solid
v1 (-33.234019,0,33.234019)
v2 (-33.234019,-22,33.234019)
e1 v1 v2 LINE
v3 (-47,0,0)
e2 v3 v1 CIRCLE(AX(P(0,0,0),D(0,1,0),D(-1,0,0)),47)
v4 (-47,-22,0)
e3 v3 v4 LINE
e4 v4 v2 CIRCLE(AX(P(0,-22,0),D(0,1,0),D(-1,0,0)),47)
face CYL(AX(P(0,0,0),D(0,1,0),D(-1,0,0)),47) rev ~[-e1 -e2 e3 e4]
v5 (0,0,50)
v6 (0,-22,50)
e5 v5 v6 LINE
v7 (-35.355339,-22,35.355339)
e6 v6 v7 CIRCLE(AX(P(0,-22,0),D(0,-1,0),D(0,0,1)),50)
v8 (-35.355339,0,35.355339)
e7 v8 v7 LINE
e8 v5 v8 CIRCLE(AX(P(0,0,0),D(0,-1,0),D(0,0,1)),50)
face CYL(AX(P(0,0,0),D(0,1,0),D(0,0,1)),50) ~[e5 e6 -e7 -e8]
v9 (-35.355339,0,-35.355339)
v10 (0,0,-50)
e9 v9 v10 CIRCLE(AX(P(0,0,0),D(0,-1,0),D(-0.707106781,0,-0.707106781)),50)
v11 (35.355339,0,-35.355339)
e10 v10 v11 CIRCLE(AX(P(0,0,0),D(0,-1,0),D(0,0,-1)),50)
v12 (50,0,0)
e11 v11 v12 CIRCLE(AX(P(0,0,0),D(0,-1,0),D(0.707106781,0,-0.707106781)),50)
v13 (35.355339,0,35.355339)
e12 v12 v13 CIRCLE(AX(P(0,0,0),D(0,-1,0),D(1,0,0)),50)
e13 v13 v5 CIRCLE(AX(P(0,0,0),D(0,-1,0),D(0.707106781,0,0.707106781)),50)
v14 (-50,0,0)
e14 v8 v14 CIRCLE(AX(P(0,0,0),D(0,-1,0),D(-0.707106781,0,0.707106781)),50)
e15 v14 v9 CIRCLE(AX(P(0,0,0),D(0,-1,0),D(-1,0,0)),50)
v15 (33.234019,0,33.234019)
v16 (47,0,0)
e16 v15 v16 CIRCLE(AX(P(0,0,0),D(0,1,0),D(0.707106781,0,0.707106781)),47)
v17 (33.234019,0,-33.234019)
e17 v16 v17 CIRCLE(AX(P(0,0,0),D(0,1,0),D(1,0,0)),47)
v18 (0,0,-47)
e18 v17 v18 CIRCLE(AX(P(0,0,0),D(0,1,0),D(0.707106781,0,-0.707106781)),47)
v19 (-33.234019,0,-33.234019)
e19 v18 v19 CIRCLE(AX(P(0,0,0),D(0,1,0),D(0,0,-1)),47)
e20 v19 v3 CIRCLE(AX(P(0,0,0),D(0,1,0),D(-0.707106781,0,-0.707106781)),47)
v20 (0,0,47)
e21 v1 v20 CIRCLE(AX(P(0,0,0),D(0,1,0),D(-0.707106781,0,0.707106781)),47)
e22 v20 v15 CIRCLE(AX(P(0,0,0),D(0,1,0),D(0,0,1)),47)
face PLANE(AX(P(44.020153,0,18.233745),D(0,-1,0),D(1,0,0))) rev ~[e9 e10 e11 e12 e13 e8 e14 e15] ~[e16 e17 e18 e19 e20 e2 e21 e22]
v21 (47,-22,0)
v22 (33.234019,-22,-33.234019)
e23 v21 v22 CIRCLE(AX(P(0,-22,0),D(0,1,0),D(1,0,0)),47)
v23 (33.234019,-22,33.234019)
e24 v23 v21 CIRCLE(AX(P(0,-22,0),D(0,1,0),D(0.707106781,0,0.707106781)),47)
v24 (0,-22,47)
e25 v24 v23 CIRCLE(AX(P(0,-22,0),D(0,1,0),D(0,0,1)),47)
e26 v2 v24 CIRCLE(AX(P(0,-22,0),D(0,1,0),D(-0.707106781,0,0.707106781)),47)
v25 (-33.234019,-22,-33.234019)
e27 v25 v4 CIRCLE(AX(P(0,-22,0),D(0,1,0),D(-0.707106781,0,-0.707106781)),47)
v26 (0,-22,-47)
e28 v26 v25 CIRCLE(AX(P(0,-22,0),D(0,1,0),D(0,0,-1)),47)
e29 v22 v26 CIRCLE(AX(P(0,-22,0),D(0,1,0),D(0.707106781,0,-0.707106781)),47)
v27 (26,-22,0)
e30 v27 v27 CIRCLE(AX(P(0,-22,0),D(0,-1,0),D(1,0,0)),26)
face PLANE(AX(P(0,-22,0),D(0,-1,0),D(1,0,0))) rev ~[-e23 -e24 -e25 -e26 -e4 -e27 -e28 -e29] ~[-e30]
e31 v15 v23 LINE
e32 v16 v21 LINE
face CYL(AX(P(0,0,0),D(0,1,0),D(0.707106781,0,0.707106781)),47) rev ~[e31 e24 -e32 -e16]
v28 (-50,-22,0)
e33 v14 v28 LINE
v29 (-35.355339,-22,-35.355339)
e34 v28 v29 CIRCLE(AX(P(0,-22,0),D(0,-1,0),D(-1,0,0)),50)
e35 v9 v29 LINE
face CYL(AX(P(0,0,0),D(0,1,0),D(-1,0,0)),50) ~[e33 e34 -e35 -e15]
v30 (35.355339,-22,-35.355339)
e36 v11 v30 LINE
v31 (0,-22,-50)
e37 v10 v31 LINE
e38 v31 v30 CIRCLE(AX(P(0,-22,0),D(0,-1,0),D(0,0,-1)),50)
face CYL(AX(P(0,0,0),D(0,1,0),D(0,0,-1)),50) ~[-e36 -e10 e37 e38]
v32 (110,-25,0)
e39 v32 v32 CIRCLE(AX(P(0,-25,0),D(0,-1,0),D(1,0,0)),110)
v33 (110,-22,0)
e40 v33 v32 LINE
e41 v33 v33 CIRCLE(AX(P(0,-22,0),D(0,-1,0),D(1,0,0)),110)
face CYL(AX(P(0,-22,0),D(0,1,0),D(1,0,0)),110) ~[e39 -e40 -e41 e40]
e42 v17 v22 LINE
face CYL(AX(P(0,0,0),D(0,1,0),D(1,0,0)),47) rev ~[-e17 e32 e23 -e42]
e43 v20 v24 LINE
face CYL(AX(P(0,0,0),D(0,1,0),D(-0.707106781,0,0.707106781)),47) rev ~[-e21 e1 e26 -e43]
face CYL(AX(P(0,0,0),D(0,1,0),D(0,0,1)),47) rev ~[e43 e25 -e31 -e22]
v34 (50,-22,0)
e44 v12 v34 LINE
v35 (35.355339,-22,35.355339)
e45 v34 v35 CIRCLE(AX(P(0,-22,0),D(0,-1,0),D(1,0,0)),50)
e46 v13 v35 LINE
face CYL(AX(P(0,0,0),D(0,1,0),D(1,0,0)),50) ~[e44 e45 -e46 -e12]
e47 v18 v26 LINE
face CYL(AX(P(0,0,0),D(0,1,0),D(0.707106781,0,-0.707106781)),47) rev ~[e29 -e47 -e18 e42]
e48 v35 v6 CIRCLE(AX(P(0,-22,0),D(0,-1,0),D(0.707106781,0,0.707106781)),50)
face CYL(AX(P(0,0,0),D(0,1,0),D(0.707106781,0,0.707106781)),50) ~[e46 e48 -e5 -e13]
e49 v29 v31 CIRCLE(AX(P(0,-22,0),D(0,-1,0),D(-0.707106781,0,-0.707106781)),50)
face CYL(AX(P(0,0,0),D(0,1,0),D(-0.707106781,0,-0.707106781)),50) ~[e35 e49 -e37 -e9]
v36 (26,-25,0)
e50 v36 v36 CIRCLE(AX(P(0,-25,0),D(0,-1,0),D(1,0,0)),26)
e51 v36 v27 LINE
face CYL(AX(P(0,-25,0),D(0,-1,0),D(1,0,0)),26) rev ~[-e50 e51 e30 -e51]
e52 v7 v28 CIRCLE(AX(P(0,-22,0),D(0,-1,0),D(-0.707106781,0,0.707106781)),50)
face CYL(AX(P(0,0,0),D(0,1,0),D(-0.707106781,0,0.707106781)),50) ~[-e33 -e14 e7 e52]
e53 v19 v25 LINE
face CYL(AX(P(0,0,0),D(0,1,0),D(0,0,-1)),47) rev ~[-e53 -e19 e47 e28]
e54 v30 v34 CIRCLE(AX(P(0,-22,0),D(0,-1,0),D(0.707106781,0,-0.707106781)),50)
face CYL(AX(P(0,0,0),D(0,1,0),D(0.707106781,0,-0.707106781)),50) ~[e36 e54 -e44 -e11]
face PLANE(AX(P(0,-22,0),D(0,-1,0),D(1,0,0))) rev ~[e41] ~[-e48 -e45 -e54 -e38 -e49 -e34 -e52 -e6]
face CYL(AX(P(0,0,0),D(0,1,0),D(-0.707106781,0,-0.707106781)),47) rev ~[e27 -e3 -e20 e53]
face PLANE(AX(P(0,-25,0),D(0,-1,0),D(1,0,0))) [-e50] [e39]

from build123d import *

# Parameters (mm, degrees)
F1_DEPTH = 22
F2_R     = 110
F2_R_2   = 50
F2_R_3   = 47
F3_DEPTH = 3
F4_R     = 26
F5_DEPTH = 3
F6_DEPTH = 25


# Not quite as in the source:
# - a feature names something its author has since deleted; it is built from what else it names


with BuildPart() as f1:
    # F0 (on Front) → F1 (new body)
    with BuildSketch(Plane.XZ):
        with BuildLine():
            Line((48.5, 0), (50, 0))
            ThreePointArc((50, 0), (46.1939766256, 19.1341716183), (35.3553390593, 35.3553390593))
            Line((35.3553390593, 35.3553390593), (34.2946788875, 34.2946788875))
            ThreePointArc((34.2946788875, 34.2946788875), (44.8081573268, 18.5601464697), (48.5, 0))
        make_face()
        with BuildLine():
            ThreePointArc((35.3553390593, -35.3553390593), (46.1939766256, -19.1341716183), (50, 0))
            Line((50, 0), (48.5, 0))
            ThreePointArc((48.5, 0), (44.8081573268, -18.5601464697), (34.2946788875, -34.2946788875))
            Line((34.2946788875, -34.2946788875), (35.3553390593, -35.3553390593))
        make_face()
        with BuildLine():
            Line((34.2946788875, 34.2946788875), (35.3553390593, 35.3553390593))
            ThreePointArc((35.3553390593, 35.3553390593), (19.1341716183, 46.1939766256), (0, 50))
            Line((0, 50), (0, 48.5))
            ThreePointArc((0, 48.5), (18.5601464697, 44.8081573268), (34.2946788875, 34.2946788875))
        make_face()
        with BuildLine():
            ThreePointArc((0, -50), (19.1341716183, -46.1939766256), (35.3553390593, -35.3553390593))
            Line((35.3553390593, -35.3553390593), (34.2946788875, -34.2946788875))
            ThreePointArc((34.2946788875, -34.2946788875), (18.5601464697, -44.8081573268), (0, -48.5))
            Line((0, -48.5), (0, -50))
        make_face()
        with BuildLine():
            Line((47, 0), (48.5, 0))
            ThreePointArc((48.5, 0), (44.8081573268, 18.5601464697), (34.2946788875, 34.2946788875))
            Line((34.2946788875, 34.2946788875), (33.2340187158, 33.2340187158))
            ThreePointArc((33.2340187158, 33.2340187158), (43.422338028, 17.9861213212), (47, 0))
        make_face()
        with BuildLine():
            ThreePointArc((34.2946788875, -34.2946788875), (44.8081573268, -18.5601464697), (48.5, 0))
            Line((48.5, 0), (47, 0))
            ThreePointArc((47, 0), (43.422338028, -17.9861213212), (33.2340187158, -33.2340187158))
            Line((33.2340187158, -33.2340187158), (34.2946788875, -34.2946788875))
        make_face()
        with BuildLine():
            Line((0, 48.5), (0, 50))
            ThreePointArc((0, 50), (-19.1341716183, 46.1939766256), (-35.3553390593, 35.3553390593))
            Line((-35.3553390593, 35.3553390593), (-34.2946788875, 34.2946788875))
            ThreePointArc((-34.2946788875, 34.2946788875), (-18.5601464697, 44.8081573268), (0, 48.5))
        make_face()
        with BuildLine():
            Line((33.2340187158, 33.2340187158), (34.2946788875, 34.2946788875))
            ThreePointArc((34.2946788875, 34.2946788875), (18.5601464697, 44.8081573268), (0, 48.5))
            Line((0, 48.5), (0, 47))
            ThreePointArc((0, 47), (17.9861213212, 43.422338028), (33.2340187158, 33.2340187158))
        make_face()
        with BuildLine():
            ThreePointArc((-35.3553390593, -35.3553390593), (-19.1341716183, -46.1939766256), (0, -50))
            Line((0, -50), (0, -48.5))
            ThreePointArc((0, -48.5), (-18.5601464697, -44.8081573268), (-34.2946788875, -34.2946788875))
            Line((-34.2946788875, -34.2946788875), (-35.3553390593, -35.3553390593))
        make_face()
        with BuildLine():
            ThreePointArc((0, -48.5), (18.5601464697, -44.8081573268), (34.2946788875, -34.2946788875))
            Line((34.2946788875, -34.2946788875), (33.2340187158, -33.2340187158))
            ThreePointArc((33.2340187158, -33.2340187158), (17.9861213212, -43.422338028), (0, -47))
            Line((0, -47), (0, -48.5))
        make_face()
        with BuildLine():
            Line((-34.2946788875, 34.2946788875), (-35.3553390593, 35.3553390593))
            ThreePointArc((-35.3553390593, 35.3553390593), (-46.1939766256, 19.1341716183), (-50, 0))
            Line((-50, 0), (-48.5, 0))
            ThreePointArc((-48.5, 0), (-44.8081573268, 18.5601464697), (-34.2946788875, 34.2946788875))
        make_face()
        with BuildLine():
            Line((0, 47), (0, 48.5))
            ThreePointArc((0, 48.5), (-18.5601464697, 44.8081573268), (-34.2946788875, 34.2946788875))
            Line((-34.2946788875, 34.2946788875), (-33.2340187158, 33.2340187158))
            ThreePointArc((-33.2340187158, 33.2340187158), (-17.9861213212, 43.422338028), (0, 47))
        make_face()
        with BuildLine():
            ThreePointArc((-50, 0), (-46.1939766256, -19.1341716183), (-35.3553390593, -35.3553390593))
            Line((-35.3553390593, -35.3553390593), (-34.2946788875, -34.2946788875))
            ThreePointArc((-34.2946788875, -34.2946788875), (-44.8081573268, -18.5601464697), (-48.5, 0))
            Line((-48.5, 0), (-50, 0))
        make_face()
        with BuildLine():
            ThreePointArc((-34.2946788875, -34.2946788875), (-18.5601464697, -44.8081573268), (0, -48.5))
            Line((0, -48.5), (0, -47))
            ThreePointArc((0, -47), (-17.9861213212, -43.422338028), (-33.2340187158, -33.2340187158))
            Line((-33.2340187158, -33.2340187158), (-34.2946788875, -34.2946788875))
        make_face()
        with BuildLine():
            Line((-33.2340187158, 33.2340187158), (-34.2946788875, 34.2946788875))
            ThreePointArc((-34.2946788875, 34.2946788875), (-44.8081573268, 18.5601464697), (-48.5, 0))
            Line((-48.5, 0), (-47, 0))
            ThreePointArc((-47, 0), (-43.422338028, 17.9861213212), (-33.2340187158, 33.2340187158))
        make_face()
        with BuildLine():
            ThreePointArc((-48.5, 0), (-44.8081573268, -18.5601464697), (-34.2946788875, -34.2946788875))
            Line((-34.2946788875, -34.2946788875), (-33.2340187158, -33.2340187158))
            ThreePointArc((-33.2340187158, -33.2340187158), (-43.422338028, -17.9861213212), (-47, 0))
            Line((-47, 0), (-48.5, 0))
        make_face()
    extrude(amount=F1_DEPTH)

    # F2 (on face) → F3 (join)
    with BuildSketch(Plane.XZ.offset(22)):
        Circle(F2_R)
        Circle(F2_R_2, mode=Mode.SUBTRACT)
        Circle(F2_R_2)
        Circle(F2_R_3, mode=Mode.SUBTRACT)
        Circle(F2_R_3)
    extrude(amount=F3_DEPTH)

    # F4 (on face) → F5 (cut, through all)
    with BuildSketch(Plane.XZ.offset(25)):
        Circle(F4_R)
    extrude(amount=-F5_DEPTH, mode=Mode.SUBTRACT)

    # F0 (on Front) → F6 (join)
    with BuildSketch(Plane.XZ):
        with BuildLine():
            Line((48.5, 0), (50, 0))
            ThreePointArc((50, 0), (46.1939766256, 19.1341716183), (35.3553390593, 35.3553390593))
            Line((35.3553390593, 35.3553390593), (34.2946788875, 34.2946788875))
            ThreePointArc((34.2946788875, 34.2946788875), (44.8081573268, 18.5601464697), (48.5, 0))
        make_face()
        with BuildLine():
            ThreePointArc((35.3553390593, -35.3553390593), (46.1939766256, -19.1341716183), (50, 0))
            Line((50, 0), (48.5, 0))
            ThreePointArc((48.5, 0), (44.8081573268, -18.5601464697), (34.2946788875, -34.2946788875))
            Line((34.2946788875, -34.2946788875), (35.3553390593, -35.3553390593))
        make_face()
        with BuildLine():
            Line((34.2946788875, 34.2946788875), (35.3553390593, 35.3553390593))
            ThreePointArc((35.3553390593, 35.3553390593), (19.1341716183, 46.1939766256), (0, 50))
            Line((0, 50), (0, 48.5))
            ThreePointArc((0, 48.5), (18.5601464697, 44.8081573268), (34.2946788875, 34.2946788875))
        make_face()
        with BuildLine():
            ThreePointArc((0, -50), (19.1341716183, -46.1939766256), (35.3553390593, -35.3553390593))
            Line((35.3553390593, -35.3553390593), (34.2946788875, -34.2946788875))
            ThreePointArc((34.2946788875, -34.2946788875), (18.5601464697, -44.8081573268), (0, -48.5))
            Line((0, -48.5), (0, -50))
        make_face()
        with BuildLine():
            Line((0, 48.5), (0, 50))
            ThreePointArc((0, 50), (-19.1341716183, 46.1939766256), (-35.3553390593, 35.3553390593))
            Line((-35.3553390593, 35.3553390593), (-34.2946788875, 34.2946788875))
            ThreePointArc((-34.2946788875, 34.2946788875), (-18.5601464697, 44.8081573268), (0, 48.5))
        make_face()
        with BuildLine():
            ThreePointArc((-35.3553390593, -35.3553390593), (-19.1341716183, -46.1939766256), (0, -50))
            Line((0, -50), (0, -48.5))
            ThreePointArc((0, -48.5), (-18.5601464697, -44.8081573268), (-34.2946788875, -34.2946788875))
            Line((-34.2946788875, -34.2946788875), (-35.3553390593, -35.3553390593))
        make_face()
        with BuildLine():
            Line((-34.2946788875, 34.2946788875), (-35.3553390593, 35.3553390593))
            ThreePointArc((-35.3553390593, 35.3553390593), (-46.1939766256, 19.1341716183), (-50, 0))
            Line((-50, 0), (-48.5, 0))
            ThreePointArc((-48.5, 0), (-44.8081573268, 18.5601464697), (-34.2946788875, 34.2946788875))
        make_face()
        with BuildLine():
            ThreePointArc((-50, 0), (-46.1939766256, -19.1341716183), (-35.3553390593, -35.3553390593))
            Line((-35.3553390593, -35.3553390593), (-34.2946788875, -34.2946788875))
            ThreePointArc((-34.2946788875, -34.2946788875), (-44.8081573268, -18.5601464697), (-48.5, 0))
            Line((-48.5, 0), (-50, 0))
        make_face()
    extrude(amount=F6_DEPTH)


solid = f1.part
